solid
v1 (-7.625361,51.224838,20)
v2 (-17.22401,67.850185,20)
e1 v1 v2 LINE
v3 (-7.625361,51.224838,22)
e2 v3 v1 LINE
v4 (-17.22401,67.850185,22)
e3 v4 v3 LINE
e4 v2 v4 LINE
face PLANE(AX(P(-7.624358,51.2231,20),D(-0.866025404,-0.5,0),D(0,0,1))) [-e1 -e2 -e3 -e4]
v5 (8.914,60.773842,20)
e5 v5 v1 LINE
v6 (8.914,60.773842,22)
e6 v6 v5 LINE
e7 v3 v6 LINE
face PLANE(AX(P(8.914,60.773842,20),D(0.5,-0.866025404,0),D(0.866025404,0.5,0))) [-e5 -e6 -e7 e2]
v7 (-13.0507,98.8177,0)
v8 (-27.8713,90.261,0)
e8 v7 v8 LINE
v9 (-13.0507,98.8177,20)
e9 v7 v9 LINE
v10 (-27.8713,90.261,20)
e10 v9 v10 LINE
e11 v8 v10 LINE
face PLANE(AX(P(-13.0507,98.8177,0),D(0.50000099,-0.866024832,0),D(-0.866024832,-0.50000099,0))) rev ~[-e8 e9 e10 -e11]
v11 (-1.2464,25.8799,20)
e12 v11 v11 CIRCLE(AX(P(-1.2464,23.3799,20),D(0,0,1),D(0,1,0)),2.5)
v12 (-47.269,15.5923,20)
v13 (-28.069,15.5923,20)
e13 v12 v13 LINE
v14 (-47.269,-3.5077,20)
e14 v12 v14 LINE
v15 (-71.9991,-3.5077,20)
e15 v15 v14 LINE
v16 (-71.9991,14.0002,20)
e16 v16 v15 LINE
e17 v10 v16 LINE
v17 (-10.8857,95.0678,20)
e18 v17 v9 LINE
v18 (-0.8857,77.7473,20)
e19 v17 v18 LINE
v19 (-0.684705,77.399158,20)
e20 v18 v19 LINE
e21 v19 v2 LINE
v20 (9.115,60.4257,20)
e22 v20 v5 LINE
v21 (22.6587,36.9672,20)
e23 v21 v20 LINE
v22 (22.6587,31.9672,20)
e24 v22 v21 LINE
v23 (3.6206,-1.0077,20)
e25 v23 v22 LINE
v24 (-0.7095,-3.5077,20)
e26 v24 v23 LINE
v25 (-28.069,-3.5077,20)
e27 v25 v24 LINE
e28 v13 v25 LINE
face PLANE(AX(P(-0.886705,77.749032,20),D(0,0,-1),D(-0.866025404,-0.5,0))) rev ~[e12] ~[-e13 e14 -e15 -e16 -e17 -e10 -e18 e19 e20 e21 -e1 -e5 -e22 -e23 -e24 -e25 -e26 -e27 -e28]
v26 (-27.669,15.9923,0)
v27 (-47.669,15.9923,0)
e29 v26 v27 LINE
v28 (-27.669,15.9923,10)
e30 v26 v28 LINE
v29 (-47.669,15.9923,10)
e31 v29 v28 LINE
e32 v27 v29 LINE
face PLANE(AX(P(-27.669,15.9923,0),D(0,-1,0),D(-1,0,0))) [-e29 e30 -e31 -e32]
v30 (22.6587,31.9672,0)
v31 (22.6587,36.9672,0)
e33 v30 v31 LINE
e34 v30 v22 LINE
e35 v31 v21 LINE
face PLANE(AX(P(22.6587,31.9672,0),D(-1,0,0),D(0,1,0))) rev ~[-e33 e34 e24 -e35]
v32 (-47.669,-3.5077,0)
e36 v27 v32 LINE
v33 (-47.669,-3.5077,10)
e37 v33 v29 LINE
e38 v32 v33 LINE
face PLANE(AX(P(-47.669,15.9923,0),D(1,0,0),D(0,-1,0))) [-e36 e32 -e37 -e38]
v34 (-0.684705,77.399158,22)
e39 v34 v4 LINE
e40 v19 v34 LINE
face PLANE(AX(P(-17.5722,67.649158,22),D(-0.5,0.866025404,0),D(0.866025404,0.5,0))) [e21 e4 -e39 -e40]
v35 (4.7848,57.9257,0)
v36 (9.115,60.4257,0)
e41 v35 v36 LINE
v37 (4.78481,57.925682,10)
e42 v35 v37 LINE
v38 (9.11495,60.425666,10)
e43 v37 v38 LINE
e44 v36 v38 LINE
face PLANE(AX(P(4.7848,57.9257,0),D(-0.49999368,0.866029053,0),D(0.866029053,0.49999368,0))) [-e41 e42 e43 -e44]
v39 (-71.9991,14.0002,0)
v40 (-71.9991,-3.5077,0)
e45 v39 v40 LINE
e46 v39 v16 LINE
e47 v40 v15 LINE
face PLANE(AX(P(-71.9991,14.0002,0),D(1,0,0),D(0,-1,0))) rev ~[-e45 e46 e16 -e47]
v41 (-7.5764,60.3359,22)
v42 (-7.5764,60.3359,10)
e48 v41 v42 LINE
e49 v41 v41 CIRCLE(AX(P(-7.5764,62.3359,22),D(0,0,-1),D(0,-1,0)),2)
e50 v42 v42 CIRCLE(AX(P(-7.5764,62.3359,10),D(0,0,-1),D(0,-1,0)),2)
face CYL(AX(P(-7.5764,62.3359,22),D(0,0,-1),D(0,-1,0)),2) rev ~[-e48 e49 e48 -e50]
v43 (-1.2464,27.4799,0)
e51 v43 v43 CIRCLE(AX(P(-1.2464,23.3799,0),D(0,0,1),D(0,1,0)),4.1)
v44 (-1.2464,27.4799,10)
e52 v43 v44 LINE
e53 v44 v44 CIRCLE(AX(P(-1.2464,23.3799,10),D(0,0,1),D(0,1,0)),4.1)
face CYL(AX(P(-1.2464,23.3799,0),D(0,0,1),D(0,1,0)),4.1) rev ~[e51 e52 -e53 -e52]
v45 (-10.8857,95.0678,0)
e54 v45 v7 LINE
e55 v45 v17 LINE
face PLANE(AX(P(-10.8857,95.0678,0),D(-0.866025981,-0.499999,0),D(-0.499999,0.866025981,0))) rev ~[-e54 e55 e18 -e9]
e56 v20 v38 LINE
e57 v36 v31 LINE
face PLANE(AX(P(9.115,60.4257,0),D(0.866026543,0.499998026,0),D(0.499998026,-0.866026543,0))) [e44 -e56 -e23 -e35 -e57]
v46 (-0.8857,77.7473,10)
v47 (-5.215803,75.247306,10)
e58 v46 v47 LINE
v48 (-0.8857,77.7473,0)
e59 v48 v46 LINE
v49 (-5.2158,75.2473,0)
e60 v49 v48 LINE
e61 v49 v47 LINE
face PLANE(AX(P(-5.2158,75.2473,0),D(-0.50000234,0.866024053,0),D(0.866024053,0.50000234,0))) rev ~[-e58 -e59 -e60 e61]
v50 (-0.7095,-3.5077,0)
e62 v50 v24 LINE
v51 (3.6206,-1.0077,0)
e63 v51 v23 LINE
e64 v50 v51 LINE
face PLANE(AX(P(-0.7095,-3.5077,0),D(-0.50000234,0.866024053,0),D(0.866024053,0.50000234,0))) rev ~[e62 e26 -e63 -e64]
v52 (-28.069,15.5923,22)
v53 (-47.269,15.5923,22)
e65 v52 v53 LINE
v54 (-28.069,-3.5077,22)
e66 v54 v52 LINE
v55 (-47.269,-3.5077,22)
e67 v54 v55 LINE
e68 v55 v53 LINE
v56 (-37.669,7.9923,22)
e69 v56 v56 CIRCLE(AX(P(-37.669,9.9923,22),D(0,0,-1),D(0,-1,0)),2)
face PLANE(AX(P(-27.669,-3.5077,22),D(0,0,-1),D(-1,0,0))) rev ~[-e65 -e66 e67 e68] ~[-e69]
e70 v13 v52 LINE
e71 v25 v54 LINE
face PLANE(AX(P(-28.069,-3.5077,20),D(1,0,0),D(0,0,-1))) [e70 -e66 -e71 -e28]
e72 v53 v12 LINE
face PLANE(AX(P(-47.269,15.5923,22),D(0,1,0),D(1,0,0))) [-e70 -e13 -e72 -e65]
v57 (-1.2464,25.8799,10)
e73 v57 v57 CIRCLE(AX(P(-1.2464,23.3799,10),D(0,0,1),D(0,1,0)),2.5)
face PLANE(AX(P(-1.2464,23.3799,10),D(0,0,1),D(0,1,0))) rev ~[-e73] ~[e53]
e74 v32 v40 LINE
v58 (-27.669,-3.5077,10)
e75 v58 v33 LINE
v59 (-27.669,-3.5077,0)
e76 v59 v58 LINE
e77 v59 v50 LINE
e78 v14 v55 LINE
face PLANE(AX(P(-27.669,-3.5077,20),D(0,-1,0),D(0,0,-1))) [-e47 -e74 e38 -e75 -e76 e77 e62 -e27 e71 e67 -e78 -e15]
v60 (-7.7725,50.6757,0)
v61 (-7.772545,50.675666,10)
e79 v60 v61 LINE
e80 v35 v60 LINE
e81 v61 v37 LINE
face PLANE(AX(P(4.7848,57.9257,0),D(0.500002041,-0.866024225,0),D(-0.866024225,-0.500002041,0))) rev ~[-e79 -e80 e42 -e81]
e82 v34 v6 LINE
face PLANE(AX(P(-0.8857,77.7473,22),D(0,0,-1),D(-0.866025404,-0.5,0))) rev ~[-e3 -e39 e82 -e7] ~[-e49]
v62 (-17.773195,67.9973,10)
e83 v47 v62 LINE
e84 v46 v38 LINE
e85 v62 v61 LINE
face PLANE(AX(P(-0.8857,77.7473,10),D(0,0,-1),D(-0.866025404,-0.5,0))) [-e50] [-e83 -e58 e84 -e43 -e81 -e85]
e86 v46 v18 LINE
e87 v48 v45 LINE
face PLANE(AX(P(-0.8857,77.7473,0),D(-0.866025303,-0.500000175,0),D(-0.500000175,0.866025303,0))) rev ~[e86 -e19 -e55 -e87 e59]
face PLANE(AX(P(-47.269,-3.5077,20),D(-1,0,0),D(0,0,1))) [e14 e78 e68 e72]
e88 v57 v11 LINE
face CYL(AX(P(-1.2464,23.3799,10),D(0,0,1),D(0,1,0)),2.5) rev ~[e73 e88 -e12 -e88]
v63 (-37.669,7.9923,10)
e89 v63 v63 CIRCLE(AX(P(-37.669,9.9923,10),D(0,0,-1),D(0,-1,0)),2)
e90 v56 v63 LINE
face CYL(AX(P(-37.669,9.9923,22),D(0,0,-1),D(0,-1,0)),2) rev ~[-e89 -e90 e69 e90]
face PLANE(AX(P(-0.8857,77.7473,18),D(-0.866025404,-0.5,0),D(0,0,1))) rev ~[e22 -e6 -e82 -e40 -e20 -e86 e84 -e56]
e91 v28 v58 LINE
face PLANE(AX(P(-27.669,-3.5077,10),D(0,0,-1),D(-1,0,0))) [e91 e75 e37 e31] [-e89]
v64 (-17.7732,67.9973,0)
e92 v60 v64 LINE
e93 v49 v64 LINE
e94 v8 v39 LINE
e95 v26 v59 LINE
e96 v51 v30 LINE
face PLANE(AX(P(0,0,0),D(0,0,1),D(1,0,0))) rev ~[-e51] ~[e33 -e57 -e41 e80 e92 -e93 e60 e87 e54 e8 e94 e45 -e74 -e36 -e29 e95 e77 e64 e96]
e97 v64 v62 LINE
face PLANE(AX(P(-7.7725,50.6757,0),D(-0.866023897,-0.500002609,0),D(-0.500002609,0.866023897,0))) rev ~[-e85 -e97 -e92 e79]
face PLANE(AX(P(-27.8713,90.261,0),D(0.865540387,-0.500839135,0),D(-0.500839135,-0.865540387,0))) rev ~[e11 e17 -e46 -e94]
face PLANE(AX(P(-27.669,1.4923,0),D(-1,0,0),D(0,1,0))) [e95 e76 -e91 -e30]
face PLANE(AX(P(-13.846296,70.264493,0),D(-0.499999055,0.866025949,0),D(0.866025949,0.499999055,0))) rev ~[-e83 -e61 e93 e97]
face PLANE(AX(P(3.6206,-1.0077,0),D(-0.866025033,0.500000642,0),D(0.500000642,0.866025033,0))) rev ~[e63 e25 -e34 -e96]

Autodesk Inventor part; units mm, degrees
ref_plane "YZ Plane" through (0, 0, 0) normal (1, 0, 0) x (0, 1, 0)
ref_plane "XZ Plane" through (0, 0, 0) normal (0, 1, 0) x (-1, 0, 0)
ref_plane "XY Plane" through (0, 0, 0) normal (0, 0, 1) x (1, 0, 0)
sketch "Sketch1" plane through (0, 0, 0) normal (0, 0, 1) x (1, 0, 0)
  line L0 (-27.669, 1.4923) -> (-27.669, 15.9923)
  line L1 (-27.669, 15.9923) -> (-47.669, 15.9923)
  line L2 (-47.669, 15.9923) -> (-47.669, 1.4923)
  line L3 (4.7848, 57.9257) -> (-7.7725, 50.6757)
  line L4 (-7.7725, 50.6757) -> (-17.7732, 67.9973)
  line L5 (-17.7732, 67.9973) -> (-5.2158, 75.2473)
  circle A0 centre (-1.2464, 23.3799) radius 2.05
  line L6 (-47.669, 1.4923) -> (-67.669, 1.4923)
  line L7 (-27.669, 1.4923) -> (-0.5414, 1.7834)
  line L8 (4.7848, 57.9257) -> (18.3286, 34.4672)
  line L9 (-0.7095, 1.4923) -> (18.3286, 34.4672)
  line L10 (-15.2158, 92.5678) -> (-5.2158, 75.2473)
  line L11 (-47.669, 1.4923) -> (-67.669, 1.4923)
  line L12 (-67.669, 1.4923) -> (-67.669, 11.5002)
  line L13 (-47.669, 11.5) -> (-47.669, 1.4923)
  line L14 (-5.2158, 75.2473) -> (-15.2158, 92.5678)
  line L15 (-15.2158, 92.5678) -> (-23.5411, 87.7613)
  line L16 (-13.8463, 70.2645) -> (-5.2158, 75.2473)
  line L17 (-5.2158, 75.2473) -> (14.7842, 75.2473) construction
  line L18 (-23.5411, 87.7613) -> (-67.669, 11.5002)
  line L19 (18.3286, 34.4672) -> (22.6587, 36.9672)
  line L20 (-0.7095, 1.4923) -> (-0.7095, -3.5077)
  line L21 (-67.669, 1.4923) -> (-67.669, -3.5077)
  line L22 (-47.669, 1.4923) -> (-47.669, -3.5077)
  line L23 (-47.669, -3.5077) -> (-67.669, -3.5077)
  line L24 (-27.669, 1.4923) -> (-27.669, -3.5077)
  line L25 (-27.669, -3.5077) -> (-0.7095, -3.5077)
  line L26 (4.7848, 57.9257) -> (9.115, 60.4257)
  line L27 (9.115, 60.4257) -> (22.6587, 36.9672)
  line L28 (-15.2158, 92.5678) -> (-10.8857, 95.0678)
  line L29 (-5.2158, 75.2473) -> (-0.8857, 77.7473)
  line L30 (-0.8857, 77.7473) -> (-10.8857, 95.0678)
  line L31 (-23.5411, 87.7613) -> (-18.5411, 87.7613) construction
  line L32 (-0.7095, 1.4923) -> (3.6206, -1.0077)
  line L33 (-0.7095, 1.4923) -> (4.2905, 1.4923) construction
  line L34 (18.3286, 34.4672) -> (22.6587, 31.9672)
  line L35 (18.3286, 34.4672) -> (23.3286, 34.4672) construction
  line L36 (-67.669, 11.5002) -> (-71.9991, 14.0002)
  line L37 (-67.669, 11.5002) -> (-62.669, 11.5002) construction
  line L38 (-23.5411, 87.7613) -> (-27.8713, 90.261)
  line L39 (-27.8713, 90.261) -> (-71.9991, 14.0002)
  line L40 (3.6206, -1.0077) -> (22.6587, 31.9672)
  line L41 (-71.9991, 14.0002) -> (-71.9991, -3.5077)
  line L42 (-71.9991, -3.5077) -> (-67.669, -3.5077)
  line L43 (-10.8857, 95.0678) -> (-13.0507, 98.8177)
  line L44 (-13.0507, 98.8177) -> (-27.8713, 90.261)
  line L45 (22.6587, 31.9672) -> (22.6587, 36.9672)
  line L46 (-0.7095, -3.5077) -> (3.6206, -1.0077)
  point P0 (0, 0)
  point P1 (0, 0)
  dimension "d19" = 4.1
  dimension "d21" = 20
  dimension "d23" = 20
  dimension "d24" = 120
  dimension "d26" = 5
  dimension "d27" = 5
  dimension "d28" = 5
  dimension "d29" = 5
  dimension "d30" = 5
  dimension "d31" = 5
  dimension "d32" = 5
  dimension "d33" = 5
  dimension "d39" = 5
  dimension "d40" = 30
  dimension "d41" = 5
  dimension "d42" = 30
  dimension "d43" = 5
  dimension "d44" = 150
  dimension "d45" = 5
  dimension "d46" = 4.33
  dimension "d55" = 90
  dimension "d56" = 120
  dimension "d57" = 90
  dimension "d58" = 90
extrude "Extrusion1" add sketch "Sketch1" along normal blind 20
sketch "Sketch4" plane through (-27.669, -3.5077, 0) normal (-1, 0, 0) x (0, 0, 1)
  line L0 (20, 19.5) -> (20, 0) projected
  line L1 (0, 19.5) -> (20, 19.5) projected
  line L2 (20, 0) -> (18, 0)
  line L3 (18, 0) -> (18, 19.5)
  line L4 (18, 19.5) -> (20, 19.5)
  line L5 (20, 19.5) -> (20, 0)
  point P0 (0, 3.5077)
  dimension "d59" = 2
extrude "Extrusion4" add sketch "Sketch4" along normal blind 20
sketch "Sketch5" plane through (-0.8857, 77.7473, 0) normal (0.5, -0.8660254, 0) x (0.8660254, 0.5, 0)
  line L0 (0, 0) -> (0, 20) projected
  line L1 (0, 20) -> (-19.5, 20)
  line L2 (-19.5, 20) -> (-19.5, 18)
  line L3 (-19.5, 18) -> (0, 18)
  line L4 (0, 18) -> (0, 20)
  point P0 (-38.1066, 0)
  dimension "d62" = 19.5
  dimension "d63" = 2
extrude "Extrusion5" add sketch "Sketch5" along normal blind 21
sketch "Sketch7" plane through (0, 0, 0) normal (0, 0, -1) x (-1, 0, 0)
  line L0 (0, 0) -> (0, 23.3799)
  circle A0 centre (1.2464, 23.3799) radius 2.05 projected
  line L1 (0, 23.3799) -> (1.2464, 23.3799)
hole "Hole1" at (-1.2464, 23.3799, 0) direction (0, 0, 1) diameter 5 end through all counterbore diameter 8.2 counterbore depth 10
sketch "Sketch8" plane through (-0.8857, 77.7473, 18) normal (0, 0, -1) x (-0.8660254, -0.5, 0)
  line L0 (0, 0) -> (0, -20.0013) projected
  line L1 (19.5, -20.0013) -> (0, -20.0013) projected
  line L2 (0, 0) -> (19.5, 0)
  line L3 (19.5, 0) -> (19.5, -20.0013)
  line L4 (19.5, -20.0013) -> (0, -20.0013)
  line L5 (0, -20.0013) -> (0, 0)
  point P0 (38.1066, -67.774)
extrude "Extrusion6" add sketch "Sketch8" along normal blind 8 and the other way blind 4
sketch "Sketch9" plane through (-27.669, -3.5077, 18) normal (0, 0, -1) x (-1, 0, 0)
  line L0 (20, 0) -> (20, 19.5) projected
  line L1 (0, 0) -> (20, 0)
  line L2 (20, 0) -> (20, 19.5)
  line L3 (20, 19.5) -> (0, 19.5)
  line L4 (0, 19.5) -> (0, 0)
  point P0 (-27.669, 3.5077)
extrude "Extrusion7" add sketch "Sketch9" along normal blind 8 and the other way blind 4
sketch "Sketch10" plane through (-0.8857, 77.7473, 22) normal (0, 0, 1) x (0.8660254, 0.5, 0)
  line L0 (0, 0) -> (-19.5, 0) projected
  line L1 (-19.5, -20.0013) -> (0, -20.0013) projected
  line L2 (0, 0) -> (-5, 0)
  line L3 (-5, 0) -> (-5, -20.0013)
  line L4 (-5, -20.0013) -> (0, -20.0013)
  line L5 (0, -20.0013) -> (0, 0)
  line L6 (-5, -20.0013) -> (-13.5, -20.0013)
  line L7 (-13.5, -20.0013) -> (-13.5, -10.0013)
  line L8 (-13.5, -10.0013) -> (-5, -10.0013)
  line L9 (-5, -10.0013) -> (-5, -20.0013)
  point P0 (-38.1066, -67.774)
  dimension "d81" = 5
  dimension "d82" = 8.5
  dimension "d83" = 10
hole "Hole2" at (-7.5764, 62.3359, 22) direction (0, 0, -1) diameter 4 end through all
sketch "Sketch11" plane through (-27.669, -3.5077, 22) normal (0, 0, 1) x (1, 0, 0)
  line L0 (-20, 0) -> (0, 0) projected
  line L1 (0, 0) -> (-20, 0)
  line L2 (-20, 0) -> (-20, 5)
  line L3 (-20, 5) -> (0, 5)
  line L4 (0, 5) -> (0, 0)
  line L5 (-20, 5) -> (-10, 5)
  line L6 (-10, 5) -> (-10, 13.5)
  line L7 (-10, 13.5) -> (-20, 13.5)
  line L8 (-20, 13.5) -> (-20, 5)
  point P0 (27.669, 3.5077)
  dimension "d91" = 20
  dimension "d92" = 5
  dimension "d93" = 10
  dimension "d101" = 8.5
hole "Hole3" at (-37.669, 9.9923, 22) direction (0, 0, -1) diameter 4 end through all
sketch "Sketch12" plane through (9.115, 60.4257, 20) normal (0.5, -0.8660254, 0) x (0.8660254, 0.5, 0)
  line L0 (0, 0) -> (-19.5, 0)
  line L1 (-19.5, 0) -> (-19.5, 2)
  line L2 (-19.5, 2) -> (0, 2)
  line L3 (0, 2) -> (0, 0)
  point P0 (-38.1066, -20)
extrude "Extrusion8" cut sketch "Sketch12" against normal blind 0.4
sketch "Sketch13" plane through (-17.7732, 67.9973, 22) normal (-0.5, 0.8660254, 0) x (0.8660254, 0.5, 0)
  line L0 (19.5, 0) -> (0, 0) projected
  line L1 (19.5, 2) -> (19.5, 0) projected
  line L2 (0, 0) -> (19.5, 0)
  line L3 (19.5, 0) -> (19.5, 2)
  line L4 (19.5, 2) -> (0, 2)
  line L5 (0, 2) -> (0, 0)
  point P0 (-18.6066, 22)
extrude "Extrusion9" cut sketch "Sketch13" against normal blind 0.4
sketch "Sketch14" plane through (-7.9725, 51.0221, 20) normal (-0.8660254, -0.5, 0) x (0, 0, 1)
  line L0 (0, 0) -> (0, 19.2013) projected
  line L1 (2, 19.2013) -> (2, 0) projected
  line L2 (0, 0) -> (2, 0)
  line L3 (2, 0) -> (2, 19.2013)
  line L4 (2, 19.2013) -> (0, 19.2013)
  line L5 (0, 19.2013) -> (0, 0)
  point P0 (-20, -48.1727)
extrude "Extrusion10" cut sketch "Sketch14" against normal blind 0.4
sketch "Sketch15" plane through (-47.669, -3.5077, 20) normal (-1, 0, 0) x (0, 0, 1)
  line L0 (0, 0) -> (2, 0)
  line L1 (2, 0) -> (2, 19.5)
  line L2 (2, 19.5) -> (0, 19.5)
  line L3 (0, 19.5) -> (0, 0)
  point P0 (-20, 3.5077)
extrude "Extrusion11" cut sketch "Sketch15" against normal blind 0.4
sketch "Sketch16" plane through (-27.669, -3.5077, 20) normal (1, 0, 0) x (0, 0, -1)
  line L0 (0, 19.5) -> (0, 0) projected
  line L1 (-2, 0) -> (-2, 19.5) projected
  line L2 (0, 0) -> (-2, 0)
  line L3 (-2, 0) -> (-2, 19.5)
  line L4 (-2, 19.5) -> (0, 19.5)
  line L5 (0, 19.5) -> (0, 0)
  point P0 (20, 3.5077)
extrude "Extrusion12" cut sketch "Sketch16" against normal blind 0.4
sketch "Sketch17" plane through (-47.269, 15.9923, 22) normal (0, 1, 0) x (1, 0, 0)
  line L0 (19.2, 0) -> (0, 0) projected
  line L1 (0, 2) -> (19.2, 2)
  line L2 (19.2, 2) -> (19.2, 0)
  line L3 (19.2, 0) -> (0, 0)
  line L4 (0, 0) -> (0, 2)
  point P0 (47.269, 22)
extrude "Extrusion13" cut sketch "Sketch17" against normal blind 0.4
properties part number "Delta Feet"
